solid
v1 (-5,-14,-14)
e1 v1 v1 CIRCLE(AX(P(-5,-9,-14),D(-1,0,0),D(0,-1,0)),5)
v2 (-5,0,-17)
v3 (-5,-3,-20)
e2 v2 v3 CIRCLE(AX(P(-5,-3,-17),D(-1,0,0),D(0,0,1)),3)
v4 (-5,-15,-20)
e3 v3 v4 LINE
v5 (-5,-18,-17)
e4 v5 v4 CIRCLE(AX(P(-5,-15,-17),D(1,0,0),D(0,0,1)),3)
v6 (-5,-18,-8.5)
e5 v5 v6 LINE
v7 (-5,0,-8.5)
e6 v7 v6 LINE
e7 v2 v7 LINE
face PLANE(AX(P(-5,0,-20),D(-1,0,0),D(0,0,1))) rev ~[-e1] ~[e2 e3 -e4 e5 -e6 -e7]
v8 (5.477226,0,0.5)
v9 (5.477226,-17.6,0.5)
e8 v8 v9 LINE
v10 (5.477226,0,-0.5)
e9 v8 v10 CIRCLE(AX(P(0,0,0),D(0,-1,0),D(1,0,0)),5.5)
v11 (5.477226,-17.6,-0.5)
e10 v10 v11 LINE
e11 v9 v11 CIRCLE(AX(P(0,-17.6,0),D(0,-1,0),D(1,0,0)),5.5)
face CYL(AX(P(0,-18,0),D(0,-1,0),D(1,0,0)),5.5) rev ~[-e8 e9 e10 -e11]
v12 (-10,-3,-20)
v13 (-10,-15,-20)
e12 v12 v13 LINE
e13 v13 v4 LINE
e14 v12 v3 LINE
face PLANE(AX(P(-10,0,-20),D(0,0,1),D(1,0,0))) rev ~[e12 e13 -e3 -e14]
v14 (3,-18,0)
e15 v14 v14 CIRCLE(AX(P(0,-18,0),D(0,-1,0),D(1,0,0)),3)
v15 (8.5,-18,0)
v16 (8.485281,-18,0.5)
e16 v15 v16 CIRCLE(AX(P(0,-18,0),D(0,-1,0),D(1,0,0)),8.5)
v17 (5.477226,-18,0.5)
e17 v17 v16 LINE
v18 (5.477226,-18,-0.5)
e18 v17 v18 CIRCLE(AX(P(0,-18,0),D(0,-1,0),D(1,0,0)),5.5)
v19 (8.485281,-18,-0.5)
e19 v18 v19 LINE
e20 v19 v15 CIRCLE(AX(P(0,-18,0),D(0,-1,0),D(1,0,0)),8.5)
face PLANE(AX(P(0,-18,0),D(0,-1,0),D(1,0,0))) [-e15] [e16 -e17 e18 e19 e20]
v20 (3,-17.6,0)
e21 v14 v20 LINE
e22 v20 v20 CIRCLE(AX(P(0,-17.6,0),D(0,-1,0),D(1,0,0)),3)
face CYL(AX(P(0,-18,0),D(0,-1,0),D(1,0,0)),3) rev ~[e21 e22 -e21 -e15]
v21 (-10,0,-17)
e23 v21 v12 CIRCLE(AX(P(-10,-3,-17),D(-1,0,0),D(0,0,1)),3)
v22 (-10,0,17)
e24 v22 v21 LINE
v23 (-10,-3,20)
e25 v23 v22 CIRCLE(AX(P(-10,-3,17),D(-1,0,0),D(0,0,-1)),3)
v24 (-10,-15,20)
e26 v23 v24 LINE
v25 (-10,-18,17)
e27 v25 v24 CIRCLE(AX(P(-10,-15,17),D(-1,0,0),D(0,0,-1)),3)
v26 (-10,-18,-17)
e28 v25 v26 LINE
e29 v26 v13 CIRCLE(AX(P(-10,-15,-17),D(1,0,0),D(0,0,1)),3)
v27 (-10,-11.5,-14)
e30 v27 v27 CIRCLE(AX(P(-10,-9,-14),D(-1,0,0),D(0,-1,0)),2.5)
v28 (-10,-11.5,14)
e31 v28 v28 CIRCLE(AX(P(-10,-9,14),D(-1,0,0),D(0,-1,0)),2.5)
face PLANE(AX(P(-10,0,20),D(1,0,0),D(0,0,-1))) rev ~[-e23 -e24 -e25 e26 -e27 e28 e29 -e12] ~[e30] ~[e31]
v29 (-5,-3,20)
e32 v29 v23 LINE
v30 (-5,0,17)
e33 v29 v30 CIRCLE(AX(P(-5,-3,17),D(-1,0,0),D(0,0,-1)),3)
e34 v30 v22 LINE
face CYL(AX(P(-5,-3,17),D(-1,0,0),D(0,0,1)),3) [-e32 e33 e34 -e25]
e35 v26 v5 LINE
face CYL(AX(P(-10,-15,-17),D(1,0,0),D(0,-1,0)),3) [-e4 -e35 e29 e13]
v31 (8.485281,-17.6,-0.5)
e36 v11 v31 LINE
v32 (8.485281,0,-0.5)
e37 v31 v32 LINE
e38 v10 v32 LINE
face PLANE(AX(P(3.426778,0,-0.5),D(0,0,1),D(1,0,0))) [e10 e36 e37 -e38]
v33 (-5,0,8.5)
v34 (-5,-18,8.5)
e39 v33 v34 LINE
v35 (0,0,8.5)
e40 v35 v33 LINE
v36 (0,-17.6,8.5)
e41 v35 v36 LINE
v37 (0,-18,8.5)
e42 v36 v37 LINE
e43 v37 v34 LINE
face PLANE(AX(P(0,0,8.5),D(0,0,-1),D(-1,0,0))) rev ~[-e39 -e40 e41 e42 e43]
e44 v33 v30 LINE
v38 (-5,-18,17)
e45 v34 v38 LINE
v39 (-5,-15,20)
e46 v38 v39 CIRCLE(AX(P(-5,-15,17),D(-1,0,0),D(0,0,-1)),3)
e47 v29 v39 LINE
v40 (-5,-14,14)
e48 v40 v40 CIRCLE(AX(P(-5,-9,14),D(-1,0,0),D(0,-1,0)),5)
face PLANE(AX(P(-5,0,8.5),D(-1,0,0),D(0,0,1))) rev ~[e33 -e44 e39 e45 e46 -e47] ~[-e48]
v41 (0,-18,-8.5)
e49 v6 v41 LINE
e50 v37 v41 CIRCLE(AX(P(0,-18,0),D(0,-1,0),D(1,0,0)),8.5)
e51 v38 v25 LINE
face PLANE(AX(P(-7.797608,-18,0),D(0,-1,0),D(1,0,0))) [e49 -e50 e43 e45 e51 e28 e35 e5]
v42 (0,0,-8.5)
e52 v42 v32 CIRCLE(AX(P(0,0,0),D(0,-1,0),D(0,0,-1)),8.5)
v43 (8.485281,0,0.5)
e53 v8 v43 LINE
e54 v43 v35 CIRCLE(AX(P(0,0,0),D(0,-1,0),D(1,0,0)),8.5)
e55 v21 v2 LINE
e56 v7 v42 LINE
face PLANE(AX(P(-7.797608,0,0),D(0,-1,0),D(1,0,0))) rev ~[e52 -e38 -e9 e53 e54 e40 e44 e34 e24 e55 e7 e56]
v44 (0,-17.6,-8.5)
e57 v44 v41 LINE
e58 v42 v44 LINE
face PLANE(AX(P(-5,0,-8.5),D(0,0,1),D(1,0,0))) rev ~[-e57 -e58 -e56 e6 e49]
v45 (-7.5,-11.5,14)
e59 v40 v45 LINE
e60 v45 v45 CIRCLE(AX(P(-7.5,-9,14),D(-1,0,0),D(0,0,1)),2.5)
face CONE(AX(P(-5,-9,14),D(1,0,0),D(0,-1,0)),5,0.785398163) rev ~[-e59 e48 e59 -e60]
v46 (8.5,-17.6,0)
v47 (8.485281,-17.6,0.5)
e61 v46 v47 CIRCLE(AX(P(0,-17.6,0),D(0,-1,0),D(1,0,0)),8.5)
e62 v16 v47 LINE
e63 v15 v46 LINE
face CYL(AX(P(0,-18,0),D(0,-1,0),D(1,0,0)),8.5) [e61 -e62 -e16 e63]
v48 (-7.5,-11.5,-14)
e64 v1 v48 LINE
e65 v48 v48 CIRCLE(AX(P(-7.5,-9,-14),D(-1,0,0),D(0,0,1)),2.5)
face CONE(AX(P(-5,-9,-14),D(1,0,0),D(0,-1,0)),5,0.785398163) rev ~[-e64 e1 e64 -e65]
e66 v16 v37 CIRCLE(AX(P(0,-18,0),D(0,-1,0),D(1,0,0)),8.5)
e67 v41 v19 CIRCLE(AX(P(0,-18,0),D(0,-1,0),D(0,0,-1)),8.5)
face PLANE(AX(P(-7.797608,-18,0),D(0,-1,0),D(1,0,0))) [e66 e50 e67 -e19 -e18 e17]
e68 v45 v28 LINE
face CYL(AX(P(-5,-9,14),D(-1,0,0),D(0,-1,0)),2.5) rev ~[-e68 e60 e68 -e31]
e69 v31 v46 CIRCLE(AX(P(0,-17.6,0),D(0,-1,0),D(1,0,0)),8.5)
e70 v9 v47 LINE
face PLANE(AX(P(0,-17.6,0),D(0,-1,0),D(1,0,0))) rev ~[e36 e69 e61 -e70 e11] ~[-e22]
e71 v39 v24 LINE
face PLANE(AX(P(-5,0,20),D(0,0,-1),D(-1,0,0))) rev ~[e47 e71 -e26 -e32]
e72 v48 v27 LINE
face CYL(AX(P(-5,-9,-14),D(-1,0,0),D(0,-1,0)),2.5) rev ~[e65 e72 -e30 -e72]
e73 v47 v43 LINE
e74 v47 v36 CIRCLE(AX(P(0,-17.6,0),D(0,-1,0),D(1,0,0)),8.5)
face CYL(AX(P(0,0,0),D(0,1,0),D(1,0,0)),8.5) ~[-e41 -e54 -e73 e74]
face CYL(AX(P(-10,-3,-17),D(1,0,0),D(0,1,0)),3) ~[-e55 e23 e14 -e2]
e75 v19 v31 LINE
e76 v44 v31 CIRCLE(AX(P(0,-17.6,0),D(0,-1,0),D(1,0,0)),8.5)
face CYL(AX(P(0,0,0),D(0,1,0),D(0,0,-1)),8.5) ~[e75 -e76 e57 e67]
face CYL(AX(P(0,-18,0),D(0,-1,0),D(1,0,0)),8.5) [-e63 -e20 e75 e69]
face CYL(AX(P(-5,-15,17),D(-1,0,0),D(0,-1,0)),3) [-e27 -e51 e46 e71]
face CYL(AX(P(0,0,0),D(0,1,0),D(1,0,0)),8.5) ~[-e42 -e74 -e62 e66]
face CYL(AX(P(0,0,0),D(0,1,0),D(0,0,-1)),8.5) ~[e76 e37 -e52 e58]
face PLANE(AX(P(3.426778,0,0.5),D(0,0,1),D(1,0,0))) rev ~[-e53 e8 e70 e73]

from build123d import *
from build123d import SkipClean  # not in build123d's __all__

# Parameters (mm, degrees)
F1_DEPTH       = 18
F2_R           = 5.5
F3_DEPTH       = 18
F5_D           = 5
F5_CSINK_D     = 10
F5_CSINK_ANGLE = 90
F6_W           = 7.3579490118
F6_H           = 1
F7_DEPTH       = 18
F8_R           = 3
F9_R           = 8.5
F9_R_2         = 3
F10_DEPTH      = 0.4


with BuildPart() as f1:
    # F0 (on Front) → F1 (new body)
    with BuildSketch(Plane.XZ):
        with BuildLine():
            ThreePointArc((-5, -6.8738635424), (-8.5, 0), (-5, 6.8738635424))
            Line((-5, 6.8738635424), (-5, 8.5))
            Line((-5, 8.5), (-5, 20))
            Line((-5, 20), (-10, 20))
            Line((-10, 20), (-10, -20))
            Line((-10, -20), (-5, -20))
            Line((-5, -20), (-5, -8.5))
            Line((-5, -8.5), (-5, -6.8738635424))
        make_face()
        with BuildLine():
            ThreePointArc((0, -8.5), (6.0104076401, -6.0104076401), (8.5, 0))
            ThreePointArc((8.5, 0), (6.0104076401, 6.0104076401), (0, 8.5))
            ThreePointArc((0, 8.5), (-2.6288932927, 8.0832493501), (-5, 6.8738635424))
            Line((-5, 6.8738635424), (-5, -6.8738635424))
            ThreePointArc((-5, -6.8738635424), (-2.6288932927, -8.0832493501), (0, -8.5))
        make_face()
        with BuildLine():
            Line((-5, -8.5), (0, -8.5))
            ThreePointArc((0, -8.5), (-2.6288932927, -8.0832493501), (-5, -6.8738635424))
            Line((-5, -6.8738635424), (-5, -8.5))
        make_face()
        with BuildLine():
            Line((-5, -6.8738635424), (-5, 6.8738635424))
            ThreePointArc((-5, 6.8738635424), (-8.5, 0), (-5, -6.8738635424))
        make_face()
        with BuildLine():
            ThreePointArc((-5, 6.8738635424), (-2.6288932927, 8.0832493501), (0, 8.5))
            Line((0, 8.5), (-5, 8.5))
            Line((-5, 8.5), (-5, 6.8738635424))
        make_face()
    extrude(amount=F1_DEPTH)

    # F2 (on face) → F3 (cut, through all)
    with BuildSketch(Plane.XZ.offset(18)):
        Circle(F2_R)
    extrude(amount=-F3_DEPTH, mode=Mode.SUBTRACT)

    # F5 (through all)
    with Locations(Plane.YZ.offset(-5)):
        with Locations((-9, -14), (-9, 14)):
            CounterSinkHole(F5_D / 2, F5_CSINK_D / 2, counter_sink_angle=F5_CSINK_ANGLE)

    # F6 (on Front) → F7 (cut, through all)
    with BuildSketch(Plane.XZ):
        with Locations((7.1057528257, 0)):
            Rectangle(F6_W, F6_H)
    extrude(amount=F7_DEPTH, mode=Mode.SUBTRACT)

    # F8
    f8_edges = [f1.edges().sort_by_distance(p)[0] for p in [
        (-7.5, -18, -20),
        (-7.5, -18, 20),
        (-7.5, 0, 20),
        (-7.5, 0, -20),
    ]]
    fillet(f8_edges, radius=F8_R)

    # F9 (on face) → F10 (join)
    with BuildSketch(Plane.XZ.offset(18)):
        Circle(F9_R)
        Circle(F9_R_2, mode=Mode.SUBTRACT)
    with SkipClean():  # cleaning this boolean's faces spoils the solid; the shape is the same uncleaned
        extrude(amount=-F10_DEPTH)


solid = f1.part
